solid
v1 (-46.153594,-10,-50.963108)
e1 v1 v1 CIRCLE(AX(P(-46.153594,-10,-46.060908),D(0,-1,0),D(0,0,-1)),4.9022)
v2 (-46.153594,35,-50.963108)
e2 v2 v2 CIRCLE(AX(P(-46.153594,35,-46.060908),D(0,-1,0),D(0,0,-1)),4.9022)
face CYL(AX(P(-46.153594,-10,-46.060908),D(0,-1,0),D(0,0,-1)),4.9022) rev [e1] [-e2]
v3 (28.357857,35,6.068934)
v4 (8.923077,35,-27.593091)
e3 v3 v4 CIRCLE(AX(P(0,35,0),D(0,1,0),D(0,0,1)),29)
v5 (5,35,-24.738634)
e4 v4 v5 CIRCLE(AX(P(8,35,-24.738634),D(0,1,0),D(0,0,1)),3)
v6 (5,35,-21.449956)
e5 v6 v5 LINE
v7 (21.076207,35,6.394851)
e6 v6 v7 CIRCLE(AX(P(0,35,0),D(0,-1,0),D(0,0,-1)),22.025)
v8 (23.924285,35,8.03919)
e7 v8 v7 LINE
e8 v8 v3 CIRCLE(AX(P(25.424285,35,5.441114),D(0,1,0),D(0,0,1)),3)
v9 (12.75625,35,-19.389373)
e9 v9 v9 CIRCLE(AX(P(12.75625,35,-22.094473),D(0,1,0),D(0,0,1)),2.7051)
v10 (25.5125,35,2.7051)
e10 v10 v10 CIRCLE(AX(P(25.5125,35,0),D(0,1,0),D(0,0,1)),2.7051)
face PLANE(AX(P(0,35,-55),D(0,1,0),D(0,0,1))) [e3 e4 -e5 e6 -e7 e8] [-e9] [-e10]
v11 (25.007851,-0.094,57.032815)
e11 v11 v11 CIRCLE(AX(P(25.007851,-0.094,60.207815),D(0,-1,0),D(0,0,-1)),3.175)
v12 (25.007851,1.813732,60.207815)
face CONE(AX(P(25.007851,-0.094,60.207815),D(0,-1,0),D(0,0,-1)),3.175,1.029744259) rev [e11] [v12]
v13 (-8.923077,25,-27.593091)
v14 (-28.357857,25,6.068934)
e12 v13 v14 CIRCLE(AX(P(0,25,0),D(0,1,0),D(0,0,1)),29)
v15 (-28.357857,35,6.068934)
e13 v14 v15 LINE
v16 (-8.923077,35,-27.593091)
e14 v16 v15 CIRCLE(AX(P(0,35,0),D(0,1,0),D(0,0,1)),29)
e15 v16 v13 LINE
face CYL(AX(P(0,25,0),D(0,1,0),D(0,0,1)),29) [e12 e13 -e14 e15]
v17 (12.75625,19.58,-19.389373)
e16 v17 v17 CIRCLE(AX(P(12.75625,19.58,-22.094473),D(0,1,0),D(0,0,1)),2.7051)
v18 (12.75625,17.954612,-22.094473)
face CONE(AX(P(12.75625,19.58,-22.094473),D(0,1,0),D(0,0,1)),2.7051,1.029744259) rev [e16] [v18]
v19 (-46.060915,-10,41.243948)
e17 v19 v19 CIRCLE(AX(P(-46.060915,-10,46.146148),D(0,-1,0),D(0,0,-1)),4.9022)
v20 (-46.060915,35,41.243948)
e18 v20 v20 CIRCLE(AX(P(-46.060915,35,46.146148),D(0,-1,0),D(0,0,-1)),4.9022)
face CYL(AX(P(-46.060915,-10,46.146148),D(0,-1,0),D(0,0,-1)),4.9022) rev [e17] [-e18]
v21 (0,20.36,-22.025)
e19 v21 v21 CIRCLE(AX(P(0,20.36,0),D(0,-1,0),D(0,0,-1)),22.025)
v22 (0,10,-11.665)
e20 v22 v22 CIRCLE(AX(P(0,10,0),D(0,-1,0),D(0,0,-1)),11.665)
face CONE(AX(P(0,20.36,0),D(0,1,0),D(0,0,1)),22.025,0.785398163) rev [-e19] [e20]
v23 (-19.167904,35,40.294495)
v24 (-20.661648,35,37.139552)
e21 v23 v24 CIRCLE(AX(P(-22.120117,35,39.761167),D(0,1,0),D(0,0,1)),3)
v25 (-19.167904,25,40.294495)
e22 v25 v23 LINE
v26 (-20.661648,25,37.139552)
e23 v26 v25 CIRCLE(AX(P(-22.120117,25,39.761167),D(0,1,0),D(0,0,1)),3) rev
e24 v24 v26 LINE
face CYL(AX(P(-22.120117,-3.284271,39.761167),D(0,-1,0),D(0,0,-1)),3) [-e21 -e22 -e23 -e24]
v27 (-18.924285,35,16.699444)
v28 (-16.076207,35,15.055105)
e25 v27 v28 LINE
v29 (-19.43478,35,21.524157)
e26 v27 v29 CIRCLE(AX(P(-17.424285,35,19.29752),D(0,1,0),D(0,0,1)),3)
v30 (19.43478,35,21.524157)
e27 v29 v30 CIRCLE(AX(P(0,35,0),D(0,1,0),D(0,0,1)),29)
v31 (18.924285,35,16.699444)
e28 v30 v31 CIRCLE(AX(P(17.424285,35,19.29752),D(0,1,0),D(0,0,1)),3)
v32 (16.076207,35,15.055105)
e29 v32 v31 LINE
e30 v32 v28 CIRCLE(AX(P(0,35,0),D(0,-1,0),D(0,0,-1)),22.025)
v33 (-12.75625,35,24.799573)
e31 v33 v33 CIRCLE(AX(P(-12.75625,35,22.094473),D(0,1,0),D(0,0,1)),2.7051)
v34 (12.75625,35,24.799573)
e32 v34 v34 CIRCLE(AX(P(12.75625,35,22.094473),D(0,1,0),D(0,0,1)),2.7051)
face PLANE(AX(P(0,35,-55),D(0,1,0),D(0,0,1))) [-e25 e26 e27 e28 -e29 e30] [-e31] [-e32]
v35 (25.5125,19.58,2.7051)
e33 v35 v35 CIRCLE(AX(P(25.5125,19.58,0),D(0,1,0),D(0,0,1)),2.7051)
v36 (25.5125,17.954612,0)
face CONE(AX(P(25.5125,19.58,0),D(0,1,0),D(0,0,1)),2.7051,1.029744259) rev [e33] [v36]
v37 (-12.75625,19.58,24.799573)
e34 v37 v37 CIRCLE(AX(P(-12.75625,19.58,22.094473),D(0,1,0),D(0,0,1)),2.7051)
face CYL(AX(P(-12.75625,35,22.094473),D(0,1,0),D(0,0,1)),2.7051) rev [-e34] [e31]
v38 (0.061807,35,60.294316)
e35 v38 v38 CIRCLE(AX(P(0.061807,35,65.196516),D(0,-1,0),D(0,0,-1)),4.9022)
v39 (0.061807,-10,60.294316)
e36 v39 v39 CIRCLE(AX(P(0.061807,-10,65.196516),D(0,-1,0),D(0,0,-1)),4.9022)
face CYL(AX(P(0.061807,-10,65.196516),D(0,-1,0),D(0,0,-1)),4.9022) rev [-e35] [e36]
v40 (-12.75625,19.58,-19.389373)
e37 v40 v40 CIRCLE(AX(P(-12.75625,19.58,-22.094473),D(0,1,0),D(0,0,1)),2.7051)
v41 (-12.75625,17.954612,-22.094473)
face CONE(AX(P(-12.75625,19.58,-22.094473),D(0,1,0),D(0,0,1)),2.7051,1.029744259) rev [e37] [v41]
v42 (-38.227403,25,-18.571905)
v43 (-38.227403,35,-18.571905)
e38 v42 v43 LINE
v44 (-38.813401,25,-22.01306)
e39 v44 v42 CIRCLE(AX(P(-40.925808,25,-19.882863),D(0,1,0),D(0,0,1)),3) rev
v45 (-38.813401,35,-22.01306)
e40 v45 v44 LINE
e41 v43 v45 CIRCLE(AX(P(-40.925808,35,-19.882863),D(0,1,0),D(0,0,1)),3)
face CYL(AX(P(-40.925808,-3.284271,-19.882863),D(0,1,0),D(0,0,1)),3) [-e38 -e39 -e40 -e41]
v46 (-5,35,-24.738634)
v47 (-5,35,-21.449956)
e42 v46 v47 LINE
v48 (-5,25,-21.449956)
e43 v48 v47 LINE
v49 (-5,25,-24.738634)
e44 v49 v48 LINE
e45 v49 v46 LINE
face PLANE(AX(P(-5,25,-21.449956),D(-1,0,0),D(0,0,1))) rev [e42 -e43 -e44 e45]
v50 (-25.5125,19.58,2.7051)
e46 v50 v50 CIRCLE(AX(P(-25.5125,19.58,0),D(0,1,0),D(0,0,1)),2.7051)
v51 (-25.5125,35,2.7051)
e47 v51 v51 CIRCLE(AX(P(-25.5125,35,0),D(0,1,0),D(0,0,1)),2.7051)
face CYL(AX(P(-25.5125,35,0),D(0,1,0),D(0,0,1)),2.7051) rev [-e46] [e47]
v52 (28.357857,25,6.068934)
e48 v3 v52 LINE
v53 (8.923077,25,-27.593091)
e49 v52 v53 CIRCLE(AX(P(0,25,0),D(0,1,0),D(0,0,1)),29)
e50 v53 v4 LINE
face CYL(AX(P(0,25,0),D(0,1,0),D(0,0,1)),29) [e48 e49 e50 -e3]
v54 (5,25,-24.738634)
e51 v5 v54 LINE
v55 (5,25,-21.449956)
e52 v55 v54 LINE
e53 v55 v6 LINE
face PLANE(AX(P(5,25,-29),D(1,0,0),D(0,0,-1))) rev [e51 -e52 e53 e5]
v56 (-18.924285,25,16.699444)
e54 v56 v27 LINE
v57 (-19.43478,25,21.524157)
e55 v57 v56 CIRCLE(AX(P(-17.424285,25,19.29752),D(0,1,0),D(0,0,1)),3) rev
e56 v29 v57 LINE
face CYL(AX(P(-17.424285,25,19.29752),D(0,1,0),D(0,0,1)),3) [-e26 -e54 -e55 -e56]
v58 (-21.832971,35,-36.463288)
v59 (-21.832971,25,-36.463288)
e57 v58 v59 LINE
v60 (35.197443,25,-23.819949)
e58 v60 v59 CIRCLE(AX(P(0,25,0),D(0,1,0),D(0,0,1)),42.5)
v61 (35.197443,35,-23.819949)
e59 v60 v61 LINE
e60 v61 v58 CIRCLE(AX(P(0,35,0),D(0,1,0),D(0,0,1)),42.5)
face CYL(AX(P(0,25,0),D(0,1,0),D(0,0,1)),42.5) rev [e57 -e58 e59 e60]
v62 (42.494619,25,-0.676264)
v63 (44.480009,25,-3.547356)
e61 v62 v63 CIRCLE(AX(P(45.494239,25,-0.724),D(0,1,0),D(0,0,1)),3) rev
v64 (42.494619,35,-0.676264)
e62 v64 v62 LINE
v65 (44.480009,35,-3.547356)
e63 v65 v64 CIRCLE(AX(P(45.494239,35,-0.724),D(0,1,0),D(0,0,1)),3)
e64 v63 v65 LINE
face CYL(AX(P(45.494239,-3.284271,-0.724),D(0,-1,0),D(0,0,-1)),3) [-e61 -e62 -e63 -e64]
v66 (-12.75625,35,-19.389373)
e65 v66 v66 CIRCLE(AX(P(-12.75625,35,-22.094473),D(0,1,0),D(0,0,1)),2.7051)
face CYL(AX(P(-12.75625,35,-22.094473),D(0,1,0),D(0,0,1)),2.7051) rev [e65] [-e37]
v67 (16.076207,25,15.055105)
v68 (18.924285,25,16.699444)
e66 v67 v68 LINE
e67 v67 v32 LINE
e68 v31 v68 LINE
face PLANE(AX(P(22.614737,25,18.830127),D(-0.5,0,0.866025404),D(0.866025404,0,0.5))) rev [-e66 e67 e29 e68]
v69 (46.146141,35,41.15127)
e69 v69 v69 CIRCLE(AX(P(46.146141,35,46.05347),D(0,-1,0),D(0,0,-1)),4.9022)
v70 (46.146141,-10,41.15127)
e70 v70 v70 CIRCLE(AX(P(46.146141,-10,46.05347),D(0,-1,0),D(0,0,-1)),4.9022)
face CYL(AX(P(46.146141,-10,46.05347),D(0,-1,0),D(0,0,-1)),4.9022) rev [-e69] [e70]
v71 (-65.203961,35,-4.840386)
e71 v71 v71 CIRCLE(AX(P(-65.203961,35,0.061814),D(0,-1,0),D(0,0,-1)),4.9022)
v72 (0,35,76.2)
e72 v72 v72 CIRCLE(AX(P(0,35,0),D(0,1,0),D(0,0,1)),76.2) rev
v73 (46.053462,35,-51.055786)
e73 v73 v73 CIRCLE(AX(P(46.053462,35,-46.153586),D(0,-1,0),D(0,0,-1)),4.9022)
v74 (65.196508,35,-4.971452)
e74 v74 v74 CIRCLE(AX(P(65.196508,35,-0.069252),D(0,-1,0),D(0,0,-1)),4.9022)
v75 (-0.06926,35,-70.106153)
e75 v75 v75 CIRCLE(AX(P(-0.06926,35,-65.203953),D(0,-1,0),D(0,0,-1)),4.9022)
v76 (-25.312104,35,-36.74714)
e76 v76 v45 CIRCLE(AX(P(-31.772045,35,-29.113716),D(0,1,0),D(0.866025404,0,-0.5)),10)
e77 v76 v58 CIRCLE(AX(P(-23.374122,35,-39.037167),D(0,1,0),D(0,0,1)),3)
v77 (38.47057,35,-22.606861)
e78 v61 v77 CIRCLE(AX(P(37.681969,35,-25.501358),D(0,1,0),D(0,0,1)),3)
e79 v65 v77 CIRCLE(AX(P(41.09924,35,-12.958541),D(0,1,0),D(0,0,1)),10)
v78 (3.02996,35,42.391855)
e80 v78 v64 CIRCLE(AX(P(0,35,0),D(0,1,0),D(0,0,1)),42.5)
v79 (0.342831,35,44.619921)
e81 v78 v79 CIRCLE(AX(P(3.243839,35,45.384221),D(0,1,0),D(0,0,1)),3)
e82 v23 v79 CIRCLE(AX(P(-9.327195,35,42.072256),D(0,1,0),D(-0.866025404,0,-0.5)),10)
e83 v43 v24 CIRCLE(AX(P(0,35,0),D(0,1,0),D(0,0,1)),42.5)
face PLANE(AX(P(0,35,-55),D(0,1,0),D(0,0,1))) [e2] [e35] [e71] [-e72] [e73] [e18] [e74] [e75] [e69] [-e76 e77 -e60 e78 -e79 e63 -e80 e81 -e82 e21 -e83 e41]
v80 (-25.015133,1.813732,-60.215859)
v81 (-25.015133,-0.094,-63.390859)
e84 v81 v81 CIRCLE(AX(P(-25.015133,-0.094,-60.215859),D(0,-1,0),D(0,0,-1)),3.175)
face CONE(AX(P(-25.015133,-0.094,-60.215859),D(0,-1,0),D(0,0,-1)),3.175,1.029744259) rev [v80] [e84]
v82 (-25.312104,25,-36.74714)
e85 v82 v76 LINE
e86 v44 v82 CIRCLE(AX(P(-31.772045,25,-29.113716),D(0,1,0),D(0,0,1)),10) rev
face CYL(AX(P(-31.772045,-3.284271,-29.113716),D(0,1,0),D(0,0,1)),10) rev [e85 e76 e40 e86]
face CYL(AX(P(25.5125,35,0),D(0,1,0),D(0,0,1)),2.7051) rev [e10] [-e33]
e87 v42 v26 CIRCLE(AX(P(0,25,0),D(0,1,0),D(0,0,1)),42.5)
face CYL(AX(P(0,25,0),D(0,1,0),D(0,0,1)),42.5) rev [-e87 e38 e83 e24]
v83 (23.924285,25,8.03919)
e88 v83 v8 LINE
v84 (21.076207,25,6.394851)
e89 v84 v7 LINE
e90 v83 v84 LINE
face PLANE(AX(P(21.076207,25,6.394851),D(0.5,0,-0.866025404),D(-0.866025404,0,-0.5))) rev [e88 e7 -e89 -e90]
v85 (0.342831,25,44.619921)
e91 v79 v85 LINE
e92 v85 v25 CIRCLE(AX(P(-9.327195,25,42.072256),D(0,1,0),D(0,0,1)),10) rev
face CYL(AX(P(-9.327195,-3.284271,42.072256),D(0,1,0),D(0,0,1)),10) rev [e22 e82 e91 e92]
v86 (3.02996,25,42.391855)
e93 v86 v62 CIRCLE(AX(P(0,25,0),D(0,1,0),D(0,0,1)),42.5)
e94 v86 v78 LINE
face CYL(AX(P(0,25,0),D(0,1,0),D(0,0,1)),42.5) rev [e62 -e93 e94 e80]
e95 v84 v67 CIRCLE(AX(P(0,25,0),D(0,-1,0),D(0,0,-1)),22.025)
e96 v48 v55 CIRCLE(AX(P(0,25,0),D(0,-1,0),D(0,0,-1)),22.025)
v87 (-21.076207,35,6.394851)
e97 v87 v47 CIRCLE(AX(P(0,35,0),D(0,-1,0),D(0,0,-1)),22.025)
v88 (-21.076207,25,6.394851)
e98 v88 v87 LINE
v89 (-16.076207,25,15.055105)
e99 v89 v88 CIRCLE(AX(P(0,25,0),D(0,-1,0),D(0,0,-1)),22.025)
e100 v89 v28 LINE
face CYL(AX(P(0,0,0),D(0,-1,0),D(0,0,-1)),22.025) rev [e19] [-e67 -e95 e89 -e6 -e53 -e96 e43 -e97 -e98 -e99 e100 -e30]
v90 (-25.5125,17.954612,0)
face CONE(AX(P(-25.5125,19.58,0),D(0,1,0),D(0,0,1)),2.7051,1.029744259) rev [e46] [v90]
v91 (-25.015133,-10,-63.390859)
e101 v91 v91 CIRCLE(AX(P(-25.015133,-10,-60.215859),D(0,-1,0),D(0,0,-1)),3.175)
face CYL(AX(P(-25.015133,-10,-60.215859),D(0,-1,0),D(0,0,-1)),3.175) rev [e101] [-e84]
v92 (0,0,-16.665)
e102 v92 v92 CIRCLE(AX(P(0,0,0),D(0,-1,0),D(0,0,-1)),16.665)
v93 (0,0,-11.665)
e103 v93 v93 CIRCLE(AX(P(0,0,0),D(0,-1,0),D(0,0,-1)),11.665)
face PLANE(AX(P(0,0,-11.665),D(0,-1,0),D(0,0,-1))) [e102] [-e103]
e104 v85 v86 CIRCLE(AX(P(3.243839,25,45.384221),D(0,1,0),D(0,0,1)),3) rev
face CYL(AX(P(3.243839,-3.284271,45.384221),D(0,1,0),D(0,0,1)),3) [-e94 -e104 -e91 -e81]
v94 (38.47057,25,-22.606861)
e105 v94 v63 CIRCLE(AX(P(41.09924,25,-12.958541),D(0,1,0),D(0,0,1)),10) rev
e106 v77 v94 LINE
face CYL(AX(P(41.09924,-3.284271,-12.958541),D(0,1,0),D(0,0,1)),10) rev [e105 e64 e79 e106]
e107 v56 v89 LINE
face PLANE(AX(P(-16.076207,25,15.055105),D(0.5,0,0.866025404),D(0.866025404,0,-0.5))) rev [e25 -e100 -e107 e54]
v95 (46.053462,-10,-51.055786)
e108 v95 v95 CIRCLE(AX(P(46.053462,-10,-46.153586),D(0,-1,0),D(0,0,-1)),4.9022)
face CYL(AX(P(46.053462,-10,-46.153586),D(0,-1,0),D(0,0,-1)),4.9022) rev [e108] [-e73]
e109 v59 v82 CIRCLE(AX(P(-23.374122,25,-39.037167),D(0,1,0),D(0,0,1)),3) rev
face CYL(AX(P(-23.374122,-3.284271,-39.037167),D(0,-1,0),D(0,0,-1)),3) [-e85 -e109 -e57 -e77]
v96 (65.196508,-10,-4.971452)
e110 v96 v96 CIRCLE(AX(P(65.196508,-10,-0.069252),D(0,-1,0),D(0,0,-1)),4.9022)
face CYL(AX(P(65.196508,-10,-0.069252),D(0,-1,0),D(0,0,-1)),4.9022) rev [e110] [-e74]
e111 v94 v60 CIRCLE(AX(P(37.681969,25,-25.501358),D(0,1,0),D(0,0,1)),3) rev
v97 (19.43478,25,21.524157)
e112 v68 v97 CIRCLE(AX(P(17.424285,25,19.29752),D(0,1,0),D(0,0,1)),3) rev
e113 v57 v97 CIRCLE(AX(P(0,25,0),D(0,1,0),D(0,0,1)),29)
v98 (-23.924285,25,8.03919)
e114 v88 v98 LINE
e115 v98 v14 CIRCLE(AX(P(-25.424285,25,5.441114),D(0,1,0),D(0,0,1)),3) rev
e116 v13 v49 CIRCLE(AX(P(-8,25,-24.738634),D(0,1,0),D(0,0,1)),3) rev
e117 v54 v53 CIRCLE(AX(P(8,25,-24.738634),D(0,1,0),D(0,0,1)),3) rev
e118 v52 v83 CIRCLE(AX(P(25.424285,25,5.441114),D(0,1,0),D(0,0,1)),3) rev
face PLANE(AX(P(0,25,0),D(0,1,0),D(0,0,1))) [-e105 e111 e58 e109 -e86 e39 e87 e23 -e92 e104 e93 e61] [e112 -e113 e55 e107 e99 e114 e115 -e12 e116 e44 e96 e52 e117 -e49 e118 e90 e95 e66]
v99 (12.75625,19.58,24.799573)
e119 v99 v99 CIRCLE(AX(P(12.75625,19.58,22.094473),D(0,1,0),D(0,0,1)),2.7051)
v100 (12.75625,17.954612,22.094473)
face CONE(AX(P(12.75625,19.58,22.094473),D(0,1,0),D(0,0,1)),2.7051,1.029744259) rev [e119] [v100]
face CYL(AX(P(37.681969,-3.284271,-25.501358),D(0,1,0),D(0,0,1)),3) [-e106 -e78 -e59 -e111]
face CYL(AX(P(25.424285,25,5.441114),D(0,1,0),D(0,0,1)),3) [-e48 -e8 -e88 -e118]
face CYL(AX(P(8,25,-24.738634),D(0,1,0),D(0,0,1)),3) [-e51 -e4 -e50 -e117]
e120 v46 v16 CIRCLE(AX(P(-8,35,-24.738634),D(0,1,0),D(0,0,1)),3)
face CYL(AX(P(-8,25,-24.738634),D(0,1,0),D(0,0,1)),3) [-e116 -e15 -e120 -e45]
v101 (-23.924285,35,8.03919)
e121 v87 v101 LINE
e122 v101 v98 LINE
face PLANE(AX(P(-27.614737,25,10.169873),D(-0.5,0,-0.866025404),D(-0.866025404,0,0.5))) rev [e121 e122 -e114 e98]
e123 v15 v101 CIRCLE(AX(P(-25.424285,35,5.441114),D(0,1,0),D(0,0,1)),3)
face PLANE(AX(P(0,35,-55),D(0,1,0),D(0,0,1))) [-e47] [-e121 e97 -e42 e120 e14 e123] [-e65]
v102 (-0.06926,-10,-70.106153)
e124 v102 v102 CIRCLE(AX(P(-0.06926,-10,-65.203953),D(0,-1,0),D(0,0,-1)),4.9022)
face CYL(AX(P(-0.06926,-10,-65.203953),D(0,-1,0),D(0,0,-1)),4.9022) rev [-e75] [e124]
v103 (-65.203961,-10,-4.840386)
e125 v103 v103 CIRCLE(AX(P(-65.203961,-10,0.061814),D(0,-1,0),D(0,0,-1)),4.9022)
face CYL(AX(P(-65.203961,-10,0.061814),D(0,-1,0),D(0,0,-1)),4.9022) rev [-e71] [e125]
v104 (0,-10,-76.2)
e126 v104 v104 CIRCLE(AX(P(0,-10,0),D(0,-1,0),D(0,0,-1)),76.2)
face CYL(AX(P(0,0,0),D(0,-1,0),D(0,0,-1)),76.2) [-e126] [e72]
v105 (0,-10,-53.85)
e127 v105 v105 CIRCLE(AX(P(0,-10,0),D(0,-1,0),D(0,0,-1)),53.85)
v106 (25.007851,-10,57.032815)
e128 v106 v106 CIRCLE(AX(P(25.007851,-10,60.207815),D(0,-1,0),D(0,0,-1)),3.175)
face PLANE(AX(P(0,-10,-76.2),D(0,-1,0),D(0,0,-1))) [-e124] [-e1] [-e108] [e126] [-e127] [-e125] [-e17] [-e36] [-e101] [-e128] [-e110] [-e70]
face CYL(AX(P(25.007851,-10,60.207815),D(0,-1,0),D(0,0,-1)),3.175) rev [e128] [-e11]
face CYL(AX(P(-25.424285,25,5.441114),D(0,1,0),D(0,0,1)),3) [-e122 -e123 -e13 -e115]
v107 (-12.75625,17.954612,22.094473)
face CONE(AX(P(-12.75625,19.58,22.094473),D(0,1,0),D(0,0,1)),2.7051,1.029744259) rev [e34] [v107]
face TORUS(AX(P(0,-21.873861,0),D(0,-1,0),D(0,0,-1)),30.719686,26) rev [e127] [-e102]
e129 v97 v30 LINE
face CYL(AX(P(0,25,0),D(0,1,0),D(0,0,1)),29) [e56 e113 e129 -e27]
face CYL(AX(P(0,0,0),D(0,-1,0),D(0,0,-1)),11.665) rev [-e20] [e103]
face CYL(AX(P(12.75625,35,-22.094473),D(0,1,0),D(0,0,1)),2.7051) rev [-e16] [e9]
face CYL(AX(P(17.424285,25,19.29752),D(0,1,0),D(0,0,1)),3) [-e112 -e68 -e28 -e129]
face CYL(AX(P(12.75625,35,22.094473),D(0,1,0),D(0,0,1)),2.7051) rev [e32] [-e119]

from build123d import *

# Parameters (mm, degrees)
SKETCH6_R                      = 42.5
SKETCH6_R_2                    = 29
CUT_EXTRUDE3_DEPTH             = 10
SKETCH7_W                      = 10
SKETCH7_H                      = 7.550043706
CUT_EXTRUDE4_DEPTH             = 10
CIRPATTERN2_COUNT              = 3
DELETEFACE1_START              = 15
DELETEFACE1_OUTLINE_R          = 76.2
DELETEFACE1_OUTLINE_R_2        = 55
DELETEFACE1_DEPTH              = 20
F_3_8_CLEARANCE_HOLE1_D        = 9.8044
SKETCH46_R                     = 10
CUT_EXTRUDE5_DEPTH             = 10
CIRPATTERN6_COUNT              = 3
FILLET2_R                      = 3
CIRPATTERN7_COUNT              = 6
F_1_4_0_2500_DOWEL_HOLE1_D     = 6.35
F_1_4_0_2500_DOWEL_HOLE1_DEPTH = 9.906
F_1_4_0_2500_DOWEL_HOLE1_TIP   = 1.907732465


# Read off the part's stored shape, not the designer's step: DeleteFace1
with BuildPart() as part:
    # Sketch3 → Revolve1 (revolve)
    with BuildSketch(Plane(origin=(0, 0, 0), x_dir=(0, 0, -1), z_dir=(1, 0, 0))):
        with BuildLine():
            Line((76.2, 15), (55, 15))
            Line((55, 15), (55, 35))
            Line((55, 35), (22.025, 35))
            Line((22.025, 35), (22.025, 20.36))
            Line((22.025, 20.36), (11.665, 10))
            Line((11.665, 10), (11.665, 0))
            Line((11.665, 0), (16.665, 0))
            ThreePointArc((16.665, 0), (37.471852779, 3.234070807), (53.85, -10))
            Line((53.85, -10), (76.2, -10))
            Line((76.2, -10), (76.2, 15))
        make_face()
    revolve(axis=Axis((0, 0, 0), (0, 1, 0)))

    # Sketch6 → Cut-Extrude3 (cut)
    with BuildSketch(Plane(origin=(0, 35, 0), x_dir=(1, 0, 0), z_dir=(0, 1, 0))):
        with Locations(Location((0, 0, 0), (0, 0, 270))):
            Circle(SKETCH6_R)
        with Locations(Location((0, 0, 0), (0, 0, 270))):
            Circle(SKETCH6_R_2, mode=Mode.SUBTRACT)
    extrude(amount=-CUT_EXTRUDE3_DEPTH, mode=Mode.SUBTRACT)

    # Sketch7 → Cut-Extrude4 (cut)
    with BuildSketch(Plane(origin=(0, 35, 0), x_dir=(1, 0, 0), z_dir=(0, 1, 0))):
        with Locations((0, 25.224978147)):
            Rectangle(SKETCH7_W, SKETCH7_H)
    cut_extrude4 = extrude(amount=-CUT_EXTRUDE4_DEPTH, mode=Mode.SUBTRACT)

    # CirPattern2: Cut-Extrude4 ×3 about axis
    cirpattern2_axis = Axis((0, 0, 0), (0, 1, 0))
    for i in range(1, CIRPATTERN2_COUNT):
        add(cut_extrude4.rotate(cirpattern2_axis, i * 360 / CIRPATTERN2_COUNT), mode=Mode.SUBTRACT)

    # DeleteFace1 outline → DeleteFace1 (add)
    with BuildSketch(Plane(origin=(0, 0, 0), x_dir=(1, 0, 0), z_dir=(0, 1, 0)).offset(DELETEFACE1_START)):
        Circle(DELETEFACE1_OUTLINE_R)
        Circle(DELETEFACE1_OUTLINE_R_2, mode=Mode.SUBTRACT)
    extrude(amount=DELETEFACE1_DEPTH)

    # 3/8 Clearance Hole1 (through all)
    with Locations(Plane(origin=(0, -10, 0), x_dir=(-1, 0, 0), z_dir=(0, -1, 0))):
        with Locations((46.153593538, 46.060907757), (65.203960939, -0.061814491), (46.060915247, -46.146148146), (-0.061807016, -65.196515566), (-46.146140681, -46.053469867), (-65.196508083, 0.069252405), (-46.053462365, 46.15358606), (0.069259897, 65.203953456)):
            Hole(F_3_8_CLEARANCE_HOLE1_D / 2)

    # Sketch46 → Cut-Extrude5 (cut)
    with BuildSketch(Plane(origin=(0, 35, 0), x_dir=(1, 0, 0), z_dir=(0, 1, 0))):
        with Locations((41.099239846, 12.958540547)):
            Circle(SKETCH46_R)
    cut_extrude5 = extrude(amount=-CUT_EXTRUDE5_DEPTH, mode=Mode.SUBTRACT)

    # CirPattern6: Cut-Extrude5 ×3 about axis
    cirpattern6_axis = Axis((0, 0, 0), (0, 1, 0))
    for i in range(1, CIRPATTERN6_COUNT):
        add(cut_extrude5.rotate(cirpattern6_axis, i * 360 / CIRPATTERN6_COUNT), mode=Mode.SUBTRACT)

    # Fillet2
    fillet2_edges = [part.edges().sort_by_distance(p)[0] for p in [
        (36.469652208, 30, -21.822338734),
        (42.390969445, 30, -3.042319763),
        (-37.133525818, 30, -20.672475912),
        (-23.830210924, 30, -35.190496549),
        (0.66387361, 30, 42.494814646),
        (-18.560758521, 30, 38.232816312),
        (5, 30, -28.565713714),
        (-5, 30, -28.565713714),
        (27.238633754, 30, 9.952729838),
        (22.238633754, 30, 18.612983876),
        (-22.238633754, 30, 18.612983876),
        (-27.238633754, 30, 9.952729838),
    ]]
    fillet(fillet2_edges, radius=FILLET2_R)

    # Sketch51 → 1/4-28 Tapped Hole1 (revolve, cut)
    with BuildSketch(Plane(origin=(25.5125, 35, 0), x_dir=(0, 0, 1), z_dir=(1, 0, 0))):
        Polygon((0, 0), (0, 17.045388061), (2.7051, 15.42), (2.7051, 0), align=None)
    f_1_4_28_tapped_hole1 = revolve(axis=Axis((25.5125, 41.35, 0), (0, -1, 0)), mode=Mode.SUBTRACT)

    # CirPattern7: 1/4-28 Tapped Hole1 ×6 about axis
    cirpattern7_axis = Axis((0, 0, 0), (0, 1, 0))
    for i in range(1, CIRPATTERN7_COUNT):
        add(f_1_4_28_tapped_hole1.rotate(cirpattern7_axis, i * 360 / CIRPATTERN7_COUNT), mode=Mode.SUBTRACT)

    # 1/4 (0.2500) Dowel Hole1
    with Locations(Plane(origin=(0, -10, 0), x_dir=(-1, 0, 0), z_dir=(0, -1, 0))):
        with Locations((-25.007850676, -60.207814752), (25.01513322, 60.21585851)):
            Hole(F_1_4_0_2500_DOWEL_HOLE1_D / 2, depth=F_1_4_0_2500_DOWEL_HOLE1_DEPTH)
            with Locations((0, 0, -(F_1_4_0_2500_DOWEL_HOLE1_DEPTH + F_1_4_0_2500_DOWEL_HOLE1_TIP / 2))):  # 118° drill point
                Cone(0, F_1_4_0_2500_DOWEL_HOLE1_D / 2, F_1_4_0_2500_DOWEL_HOLE1_TIP, mode=Mode.SUBTRACT)


solid = part.part
